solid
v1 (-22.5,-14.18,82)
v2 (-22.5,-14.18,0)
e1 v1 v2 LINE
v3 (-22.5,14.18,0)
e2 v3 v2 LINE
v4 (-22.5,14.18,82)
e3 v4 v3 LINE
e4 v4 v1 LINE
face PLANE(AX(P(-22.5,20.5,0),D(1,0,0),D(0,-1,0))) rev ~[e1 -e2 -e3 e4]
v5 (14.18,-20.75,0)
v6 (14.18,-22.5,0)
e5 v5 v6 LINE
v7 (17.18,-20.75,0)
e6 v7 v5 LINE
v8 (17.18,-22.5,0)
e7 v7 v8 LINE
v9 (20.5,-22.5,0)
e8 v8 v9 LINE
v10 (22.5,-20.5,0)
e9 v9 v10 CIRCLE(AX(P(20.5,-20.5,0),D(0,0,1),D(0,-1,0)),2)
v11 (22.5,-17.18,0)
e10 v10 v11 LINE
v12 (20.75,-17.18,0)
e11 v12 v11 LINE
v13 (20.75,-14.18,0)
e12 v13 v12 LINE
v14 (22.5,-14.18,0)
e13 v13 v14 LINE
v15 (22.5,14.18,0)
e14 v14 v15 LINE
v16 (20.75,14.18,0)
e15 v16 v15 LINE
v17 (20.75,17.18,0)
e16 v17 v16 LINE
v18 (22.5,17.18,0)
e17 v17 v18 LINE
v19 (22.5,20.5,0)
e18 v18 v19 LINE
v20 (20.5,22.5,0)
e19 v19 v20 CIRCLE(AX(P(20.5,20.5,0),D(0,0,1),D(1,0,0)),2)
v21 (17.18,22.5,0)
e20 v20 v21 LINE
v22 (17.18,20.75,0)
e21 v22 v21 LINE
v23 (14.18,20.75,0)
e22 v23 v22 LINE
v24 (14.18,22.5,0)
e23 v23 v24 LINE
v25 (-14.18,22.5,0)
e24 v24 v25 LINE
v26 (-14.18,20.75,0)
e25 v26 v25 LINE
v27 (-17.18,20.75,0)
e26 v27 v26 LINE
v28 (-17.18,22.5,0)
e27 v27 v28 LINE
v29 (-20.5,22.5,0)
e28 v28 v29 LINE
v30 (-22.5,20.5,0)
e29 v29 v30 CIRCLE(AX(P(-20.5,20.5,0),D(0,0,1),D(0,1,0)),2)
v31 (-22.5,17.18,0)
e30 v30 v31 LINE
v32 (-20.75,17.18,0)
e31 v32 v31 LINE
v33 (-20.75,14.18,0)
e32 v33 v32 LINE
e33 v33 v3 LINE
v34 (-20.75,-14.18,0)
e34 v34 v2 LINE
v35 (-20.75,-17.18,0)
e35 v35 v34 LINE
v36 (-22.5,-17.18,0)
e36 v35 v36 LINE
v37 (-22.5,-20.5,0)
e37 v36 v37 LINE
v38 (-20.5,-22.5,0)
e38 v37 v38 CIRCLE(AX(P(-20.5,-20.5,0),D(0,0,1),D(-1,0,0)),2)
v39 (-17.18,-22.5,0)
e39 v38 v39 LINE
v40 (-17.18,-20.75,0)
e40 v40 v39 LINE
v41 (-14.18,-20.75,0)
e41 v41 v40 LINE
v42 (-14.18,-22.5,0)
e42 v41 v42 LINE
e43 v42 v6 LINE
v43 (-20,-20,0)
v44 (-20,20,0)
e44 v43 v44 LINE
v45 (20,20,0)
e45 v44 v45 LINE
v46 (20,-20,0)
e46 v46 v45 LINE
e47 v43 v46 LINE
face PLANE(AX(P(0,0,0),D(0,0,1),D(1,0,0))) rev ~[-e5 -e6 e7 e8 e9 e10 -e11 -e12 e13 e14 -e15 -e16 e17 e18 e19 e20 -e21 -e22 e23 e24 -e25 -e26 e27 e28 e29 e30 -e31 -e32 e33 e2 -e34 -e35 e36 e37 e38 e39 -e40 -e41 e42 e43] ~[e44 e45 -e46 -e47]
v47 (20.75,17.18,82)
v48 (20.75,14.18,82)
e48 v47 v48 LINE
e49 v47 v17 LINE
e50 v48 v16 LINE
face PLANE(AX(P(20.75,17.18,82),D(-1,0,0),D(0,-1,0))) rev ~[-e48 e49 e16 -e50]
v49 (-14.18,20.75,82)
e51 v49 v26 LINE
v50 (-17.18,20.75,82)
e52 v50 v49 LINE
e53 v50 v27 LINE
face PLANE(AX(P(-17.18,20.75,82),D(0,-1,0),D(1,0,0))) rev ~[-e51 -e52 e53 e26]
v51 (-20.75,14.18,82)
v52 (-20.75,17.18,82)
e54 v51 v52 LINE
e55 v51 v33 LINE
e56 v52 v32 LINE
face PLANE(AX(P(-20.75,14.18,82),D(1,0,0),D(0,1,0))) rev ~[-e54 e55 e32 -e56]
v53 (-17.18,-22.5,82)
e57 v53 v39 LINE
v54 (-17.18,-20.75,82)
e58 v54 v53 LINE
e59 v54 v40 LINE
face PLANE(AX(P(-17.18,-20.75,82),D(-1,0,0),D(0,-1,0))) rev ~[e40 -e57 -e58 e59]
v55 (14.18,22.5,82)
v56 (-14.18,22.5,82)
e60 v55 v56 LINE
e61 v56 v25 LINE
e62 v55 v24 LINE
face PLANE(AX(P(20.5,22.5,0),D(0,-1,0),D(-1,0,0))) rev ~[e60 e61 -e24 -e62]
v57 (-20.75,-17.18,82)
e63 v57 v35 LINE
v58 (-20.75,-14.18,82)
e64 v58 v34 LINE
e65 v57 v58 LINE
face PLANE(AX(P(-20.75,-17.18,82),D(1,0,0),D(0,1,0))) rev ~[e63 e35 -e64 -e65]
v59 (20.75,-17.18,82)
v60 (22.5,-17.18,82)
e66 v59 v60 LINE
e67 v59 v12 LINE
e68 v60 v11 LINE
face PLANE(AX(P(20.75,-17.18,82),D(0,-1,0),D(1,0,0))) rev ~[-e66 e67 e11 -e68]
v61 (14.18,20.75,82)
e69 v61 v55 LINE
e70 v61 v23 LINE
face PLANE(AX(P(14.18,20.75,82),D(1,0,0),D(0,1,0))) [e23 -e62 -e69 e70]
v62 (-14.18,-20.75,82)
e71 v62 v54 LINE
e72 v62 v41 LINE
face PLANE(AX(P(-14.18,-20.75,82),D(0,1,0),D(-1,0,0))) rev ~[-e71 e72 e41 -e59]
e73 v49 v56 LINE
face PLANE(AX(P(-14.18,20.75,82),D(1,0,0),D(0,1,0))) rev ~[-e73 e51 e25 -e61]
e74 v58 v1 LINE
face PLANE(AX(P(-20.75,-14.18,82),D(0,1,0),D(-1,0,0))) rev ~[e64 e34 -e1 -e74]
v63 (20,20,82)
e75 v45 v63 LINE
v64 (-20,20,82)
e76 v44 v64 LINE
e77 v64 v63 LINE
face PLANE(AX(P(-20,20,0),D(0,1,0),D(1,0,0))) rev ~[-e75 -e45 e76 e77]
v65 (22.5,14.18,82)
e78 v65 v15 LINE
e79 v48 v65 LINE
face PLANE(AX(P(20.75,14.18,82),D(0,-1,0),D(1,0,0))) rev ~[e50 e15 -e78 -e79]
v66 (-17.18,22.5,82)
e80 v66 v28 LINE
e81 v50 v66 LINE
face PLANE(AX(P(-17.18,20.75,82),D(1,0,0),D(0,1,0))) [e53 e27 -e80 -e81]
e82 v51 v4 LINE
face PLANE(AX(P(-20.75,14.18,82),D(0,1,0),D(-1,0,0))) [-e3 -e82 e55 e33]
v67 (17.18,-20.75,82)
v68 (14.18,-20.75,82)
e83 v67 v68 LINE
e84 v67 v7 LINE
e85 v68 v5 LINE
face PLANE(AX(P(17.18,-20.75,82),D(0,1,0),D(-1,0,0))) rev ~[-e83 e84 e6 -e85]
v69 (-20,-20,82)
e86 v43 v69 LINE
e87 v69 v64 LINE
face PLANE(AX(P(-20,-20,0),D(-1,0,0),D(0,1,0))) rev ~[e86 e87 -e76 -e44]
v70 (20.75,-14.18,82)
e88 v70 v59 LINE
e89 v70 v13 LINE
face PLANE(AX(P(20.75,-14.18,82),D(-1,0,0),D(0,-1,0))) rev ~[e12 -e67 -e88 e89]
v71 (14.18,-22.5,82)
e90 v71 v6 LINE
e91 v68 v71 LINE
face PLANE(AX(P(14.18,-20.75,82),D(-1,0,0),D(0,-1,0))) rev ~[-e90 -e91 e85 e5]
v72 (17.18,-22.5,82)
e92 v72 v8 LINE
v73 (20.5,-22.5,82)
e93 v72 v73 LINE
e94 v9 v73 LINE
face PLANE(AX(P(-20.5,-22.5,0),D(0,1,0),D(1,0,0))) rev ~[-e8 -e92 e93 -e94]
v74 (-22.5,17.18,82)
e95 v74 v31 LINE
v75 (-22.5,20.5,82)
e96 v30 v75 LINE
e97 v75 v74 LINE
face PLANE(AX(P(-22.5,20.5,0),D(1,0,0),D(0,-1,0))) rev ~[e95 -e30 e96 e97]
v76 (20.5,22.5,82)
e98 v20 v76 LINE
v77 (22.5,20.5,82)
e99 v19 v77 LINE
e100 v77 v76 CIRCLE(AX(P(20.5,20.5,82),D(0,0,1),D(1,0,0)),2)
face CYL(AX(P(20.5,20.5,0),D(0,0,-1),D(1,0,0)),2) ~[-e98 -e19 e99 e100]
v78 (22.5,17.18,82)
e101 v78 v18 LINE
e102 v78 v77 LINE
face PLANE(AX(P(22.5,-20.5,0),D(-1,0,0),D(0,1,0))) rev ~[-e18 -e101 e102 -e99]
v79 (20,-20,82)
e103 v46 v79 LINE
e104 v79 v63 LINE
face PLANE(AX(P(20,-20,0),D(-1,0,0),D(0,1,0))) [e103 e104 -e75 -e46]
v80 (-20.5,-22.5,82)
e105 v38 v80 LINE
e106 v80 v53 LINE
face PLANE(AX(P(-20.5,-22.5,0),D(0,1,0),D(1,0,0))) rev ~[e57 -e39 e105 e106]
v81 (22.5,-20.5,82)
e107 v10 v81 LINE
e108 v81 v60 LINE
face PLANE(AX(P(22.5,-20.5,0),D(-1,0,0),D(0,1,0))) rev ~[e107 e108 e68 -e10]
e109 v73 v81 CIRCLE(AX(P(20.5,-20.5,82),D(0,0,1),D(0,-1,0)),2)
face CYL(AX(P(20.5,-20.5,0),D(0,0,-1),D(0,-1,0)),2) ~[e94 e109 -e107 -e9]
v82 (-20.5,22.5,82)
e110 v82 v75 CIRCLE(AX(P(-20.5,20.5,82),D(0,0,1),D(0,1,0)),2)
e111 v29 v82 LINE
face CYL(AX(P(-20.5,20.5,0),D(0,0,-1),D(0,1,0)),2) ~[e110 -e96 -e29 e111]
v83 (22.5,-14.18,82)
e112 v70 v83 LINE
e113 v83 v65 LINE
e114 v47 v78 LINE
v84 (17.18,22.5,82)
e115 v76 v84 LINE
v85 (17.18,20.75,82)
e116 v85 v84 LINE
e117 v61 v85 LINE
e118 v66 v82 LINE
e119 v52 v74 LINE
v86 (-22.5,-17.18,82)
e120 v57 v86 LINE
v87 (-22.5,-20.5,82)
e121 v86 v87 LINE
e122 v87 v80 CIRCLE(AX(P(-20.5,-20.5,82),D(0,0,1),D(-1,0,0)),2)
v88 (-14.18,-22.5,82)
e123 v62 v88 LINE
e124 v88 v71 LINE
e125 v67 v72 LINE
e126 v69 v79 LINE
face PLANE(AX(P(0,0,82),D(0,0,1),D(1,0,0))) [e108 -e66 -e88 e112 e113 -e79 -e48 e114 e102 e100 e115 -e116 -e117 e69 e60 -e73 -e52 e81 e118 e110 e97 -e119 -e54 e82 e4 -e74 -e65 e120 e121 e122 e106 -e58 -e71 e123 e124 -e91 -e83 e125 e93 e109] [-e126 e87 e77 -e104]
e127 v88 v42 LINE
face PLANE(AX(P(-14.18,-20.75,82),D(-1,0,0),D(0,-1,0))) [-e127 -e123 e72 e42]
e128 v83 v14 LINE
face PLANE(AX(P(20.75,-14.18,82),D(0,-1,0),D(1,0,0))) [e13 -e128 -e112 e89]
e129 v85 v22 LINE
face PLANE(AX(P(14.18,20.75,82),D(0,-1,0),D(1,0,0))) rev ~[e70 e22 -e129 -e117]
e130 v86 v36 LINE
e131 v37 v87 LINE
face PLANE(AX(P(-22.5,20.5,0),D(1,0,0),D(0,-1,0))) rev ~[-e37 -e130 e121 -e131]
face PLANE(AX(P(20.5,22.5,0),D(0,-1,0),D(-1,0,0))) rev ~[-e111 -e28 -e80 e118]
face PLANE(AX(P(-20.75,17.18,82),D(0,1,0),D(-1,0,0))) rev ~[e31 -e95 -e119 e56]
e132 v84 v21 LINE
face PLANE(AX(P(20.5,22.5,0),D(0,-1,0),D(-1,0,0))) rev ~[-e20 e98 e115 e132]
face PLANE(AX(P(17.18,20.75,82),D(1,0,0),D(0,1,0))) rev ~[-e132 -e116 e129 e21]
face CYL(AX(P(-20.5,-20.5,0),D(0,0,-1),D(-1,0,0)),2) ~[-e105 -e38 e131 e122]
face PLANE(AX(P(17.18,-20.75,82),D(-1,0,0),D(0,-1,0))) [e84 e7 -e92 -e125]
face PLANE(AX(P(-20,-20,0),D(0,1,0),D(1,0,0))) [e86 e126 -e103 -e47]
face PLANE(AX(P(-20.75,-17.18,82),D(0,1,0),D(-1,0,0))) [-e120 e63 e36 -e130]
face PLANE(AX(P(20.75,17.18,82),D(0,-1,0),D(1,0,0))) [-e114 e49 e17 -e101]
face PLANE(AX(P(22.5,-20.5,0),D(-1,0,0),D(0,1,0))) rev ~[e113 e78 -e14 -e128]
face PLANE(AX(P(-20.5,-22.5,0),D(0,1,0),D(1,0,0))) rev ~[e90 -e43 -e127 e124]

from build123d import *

# Parameters (mm, degrees)
F0_W            = 40
F0_H            = 40
F1_DEPTH        = 82
F2_W            = 3
F2_H            = 1.75
F3_DEPTH        = 82
F3_COPIES_COUNT = 4


# Not quite as in the source:
# - a pattern or mirror of a feature is missing from the dataset's text; its kind, count and spacing are read off the source's solid


with BuildPart() as f1:
    # F0 (on Top) → F1 (new body)
    with BuildSketch(Plane.XY):
        with BuildLine():
            Line((-20.5, -22.5), (20.5, -22.5))
            ThreePointArc((20.5, -22.5), (21.9142135624, -21.9142135624), (22.5, -20.5))
            Line((22.5, -20.5), (22.5, 20.5))
            ThreePointArc((22.5, 20.5), (21.9142135624, 21.9142135624), (20.5, 22.5))
            Line((20.5, 22.5), (-20.5, 22.5))
            ThreePointArc((-20.5, 22.5), (-21.9142135624, 21.9142135624), (-22.5, 20.5))
            Line((-22.5, 20.5), (-22.5, -20.5))
            ThreePointArc((-22.5, -20.5), (-21.9142135624, -21.9142135624), (-20.5, -22.5))
        make_face()
        Rectangle(F0_W, F0_H, mode=Mode.SUBTRACT)
    extrude(amount=F1_DEPTH)

    # F2 (on face) → F3 (cut, through all)
    with BuildSketch(Plane.XY.offset(82)):
        with Locations((-15.68, 21.625)):
            Rectangle(F2_W, F2_H)
        with Locations((15.68, 21.625)):
            Rectangle(F2_W, F2_H)
    f3 = extrude(amount=-F3_DEPTH, mode=Mode.SUBTRACT)

    # F3_copies: F3 ×4 about axis
    f3_copies_axis = Axis((0, 0, 0), (0, 0, 1))
    for i in range(1, F3_COPIES_COUNT):
        add(f3.rotate(f3_copies_axis, i * 360 / F3_COPIES_COUNT), mode=Mode.SUBTRACT)


solid = f1.part
